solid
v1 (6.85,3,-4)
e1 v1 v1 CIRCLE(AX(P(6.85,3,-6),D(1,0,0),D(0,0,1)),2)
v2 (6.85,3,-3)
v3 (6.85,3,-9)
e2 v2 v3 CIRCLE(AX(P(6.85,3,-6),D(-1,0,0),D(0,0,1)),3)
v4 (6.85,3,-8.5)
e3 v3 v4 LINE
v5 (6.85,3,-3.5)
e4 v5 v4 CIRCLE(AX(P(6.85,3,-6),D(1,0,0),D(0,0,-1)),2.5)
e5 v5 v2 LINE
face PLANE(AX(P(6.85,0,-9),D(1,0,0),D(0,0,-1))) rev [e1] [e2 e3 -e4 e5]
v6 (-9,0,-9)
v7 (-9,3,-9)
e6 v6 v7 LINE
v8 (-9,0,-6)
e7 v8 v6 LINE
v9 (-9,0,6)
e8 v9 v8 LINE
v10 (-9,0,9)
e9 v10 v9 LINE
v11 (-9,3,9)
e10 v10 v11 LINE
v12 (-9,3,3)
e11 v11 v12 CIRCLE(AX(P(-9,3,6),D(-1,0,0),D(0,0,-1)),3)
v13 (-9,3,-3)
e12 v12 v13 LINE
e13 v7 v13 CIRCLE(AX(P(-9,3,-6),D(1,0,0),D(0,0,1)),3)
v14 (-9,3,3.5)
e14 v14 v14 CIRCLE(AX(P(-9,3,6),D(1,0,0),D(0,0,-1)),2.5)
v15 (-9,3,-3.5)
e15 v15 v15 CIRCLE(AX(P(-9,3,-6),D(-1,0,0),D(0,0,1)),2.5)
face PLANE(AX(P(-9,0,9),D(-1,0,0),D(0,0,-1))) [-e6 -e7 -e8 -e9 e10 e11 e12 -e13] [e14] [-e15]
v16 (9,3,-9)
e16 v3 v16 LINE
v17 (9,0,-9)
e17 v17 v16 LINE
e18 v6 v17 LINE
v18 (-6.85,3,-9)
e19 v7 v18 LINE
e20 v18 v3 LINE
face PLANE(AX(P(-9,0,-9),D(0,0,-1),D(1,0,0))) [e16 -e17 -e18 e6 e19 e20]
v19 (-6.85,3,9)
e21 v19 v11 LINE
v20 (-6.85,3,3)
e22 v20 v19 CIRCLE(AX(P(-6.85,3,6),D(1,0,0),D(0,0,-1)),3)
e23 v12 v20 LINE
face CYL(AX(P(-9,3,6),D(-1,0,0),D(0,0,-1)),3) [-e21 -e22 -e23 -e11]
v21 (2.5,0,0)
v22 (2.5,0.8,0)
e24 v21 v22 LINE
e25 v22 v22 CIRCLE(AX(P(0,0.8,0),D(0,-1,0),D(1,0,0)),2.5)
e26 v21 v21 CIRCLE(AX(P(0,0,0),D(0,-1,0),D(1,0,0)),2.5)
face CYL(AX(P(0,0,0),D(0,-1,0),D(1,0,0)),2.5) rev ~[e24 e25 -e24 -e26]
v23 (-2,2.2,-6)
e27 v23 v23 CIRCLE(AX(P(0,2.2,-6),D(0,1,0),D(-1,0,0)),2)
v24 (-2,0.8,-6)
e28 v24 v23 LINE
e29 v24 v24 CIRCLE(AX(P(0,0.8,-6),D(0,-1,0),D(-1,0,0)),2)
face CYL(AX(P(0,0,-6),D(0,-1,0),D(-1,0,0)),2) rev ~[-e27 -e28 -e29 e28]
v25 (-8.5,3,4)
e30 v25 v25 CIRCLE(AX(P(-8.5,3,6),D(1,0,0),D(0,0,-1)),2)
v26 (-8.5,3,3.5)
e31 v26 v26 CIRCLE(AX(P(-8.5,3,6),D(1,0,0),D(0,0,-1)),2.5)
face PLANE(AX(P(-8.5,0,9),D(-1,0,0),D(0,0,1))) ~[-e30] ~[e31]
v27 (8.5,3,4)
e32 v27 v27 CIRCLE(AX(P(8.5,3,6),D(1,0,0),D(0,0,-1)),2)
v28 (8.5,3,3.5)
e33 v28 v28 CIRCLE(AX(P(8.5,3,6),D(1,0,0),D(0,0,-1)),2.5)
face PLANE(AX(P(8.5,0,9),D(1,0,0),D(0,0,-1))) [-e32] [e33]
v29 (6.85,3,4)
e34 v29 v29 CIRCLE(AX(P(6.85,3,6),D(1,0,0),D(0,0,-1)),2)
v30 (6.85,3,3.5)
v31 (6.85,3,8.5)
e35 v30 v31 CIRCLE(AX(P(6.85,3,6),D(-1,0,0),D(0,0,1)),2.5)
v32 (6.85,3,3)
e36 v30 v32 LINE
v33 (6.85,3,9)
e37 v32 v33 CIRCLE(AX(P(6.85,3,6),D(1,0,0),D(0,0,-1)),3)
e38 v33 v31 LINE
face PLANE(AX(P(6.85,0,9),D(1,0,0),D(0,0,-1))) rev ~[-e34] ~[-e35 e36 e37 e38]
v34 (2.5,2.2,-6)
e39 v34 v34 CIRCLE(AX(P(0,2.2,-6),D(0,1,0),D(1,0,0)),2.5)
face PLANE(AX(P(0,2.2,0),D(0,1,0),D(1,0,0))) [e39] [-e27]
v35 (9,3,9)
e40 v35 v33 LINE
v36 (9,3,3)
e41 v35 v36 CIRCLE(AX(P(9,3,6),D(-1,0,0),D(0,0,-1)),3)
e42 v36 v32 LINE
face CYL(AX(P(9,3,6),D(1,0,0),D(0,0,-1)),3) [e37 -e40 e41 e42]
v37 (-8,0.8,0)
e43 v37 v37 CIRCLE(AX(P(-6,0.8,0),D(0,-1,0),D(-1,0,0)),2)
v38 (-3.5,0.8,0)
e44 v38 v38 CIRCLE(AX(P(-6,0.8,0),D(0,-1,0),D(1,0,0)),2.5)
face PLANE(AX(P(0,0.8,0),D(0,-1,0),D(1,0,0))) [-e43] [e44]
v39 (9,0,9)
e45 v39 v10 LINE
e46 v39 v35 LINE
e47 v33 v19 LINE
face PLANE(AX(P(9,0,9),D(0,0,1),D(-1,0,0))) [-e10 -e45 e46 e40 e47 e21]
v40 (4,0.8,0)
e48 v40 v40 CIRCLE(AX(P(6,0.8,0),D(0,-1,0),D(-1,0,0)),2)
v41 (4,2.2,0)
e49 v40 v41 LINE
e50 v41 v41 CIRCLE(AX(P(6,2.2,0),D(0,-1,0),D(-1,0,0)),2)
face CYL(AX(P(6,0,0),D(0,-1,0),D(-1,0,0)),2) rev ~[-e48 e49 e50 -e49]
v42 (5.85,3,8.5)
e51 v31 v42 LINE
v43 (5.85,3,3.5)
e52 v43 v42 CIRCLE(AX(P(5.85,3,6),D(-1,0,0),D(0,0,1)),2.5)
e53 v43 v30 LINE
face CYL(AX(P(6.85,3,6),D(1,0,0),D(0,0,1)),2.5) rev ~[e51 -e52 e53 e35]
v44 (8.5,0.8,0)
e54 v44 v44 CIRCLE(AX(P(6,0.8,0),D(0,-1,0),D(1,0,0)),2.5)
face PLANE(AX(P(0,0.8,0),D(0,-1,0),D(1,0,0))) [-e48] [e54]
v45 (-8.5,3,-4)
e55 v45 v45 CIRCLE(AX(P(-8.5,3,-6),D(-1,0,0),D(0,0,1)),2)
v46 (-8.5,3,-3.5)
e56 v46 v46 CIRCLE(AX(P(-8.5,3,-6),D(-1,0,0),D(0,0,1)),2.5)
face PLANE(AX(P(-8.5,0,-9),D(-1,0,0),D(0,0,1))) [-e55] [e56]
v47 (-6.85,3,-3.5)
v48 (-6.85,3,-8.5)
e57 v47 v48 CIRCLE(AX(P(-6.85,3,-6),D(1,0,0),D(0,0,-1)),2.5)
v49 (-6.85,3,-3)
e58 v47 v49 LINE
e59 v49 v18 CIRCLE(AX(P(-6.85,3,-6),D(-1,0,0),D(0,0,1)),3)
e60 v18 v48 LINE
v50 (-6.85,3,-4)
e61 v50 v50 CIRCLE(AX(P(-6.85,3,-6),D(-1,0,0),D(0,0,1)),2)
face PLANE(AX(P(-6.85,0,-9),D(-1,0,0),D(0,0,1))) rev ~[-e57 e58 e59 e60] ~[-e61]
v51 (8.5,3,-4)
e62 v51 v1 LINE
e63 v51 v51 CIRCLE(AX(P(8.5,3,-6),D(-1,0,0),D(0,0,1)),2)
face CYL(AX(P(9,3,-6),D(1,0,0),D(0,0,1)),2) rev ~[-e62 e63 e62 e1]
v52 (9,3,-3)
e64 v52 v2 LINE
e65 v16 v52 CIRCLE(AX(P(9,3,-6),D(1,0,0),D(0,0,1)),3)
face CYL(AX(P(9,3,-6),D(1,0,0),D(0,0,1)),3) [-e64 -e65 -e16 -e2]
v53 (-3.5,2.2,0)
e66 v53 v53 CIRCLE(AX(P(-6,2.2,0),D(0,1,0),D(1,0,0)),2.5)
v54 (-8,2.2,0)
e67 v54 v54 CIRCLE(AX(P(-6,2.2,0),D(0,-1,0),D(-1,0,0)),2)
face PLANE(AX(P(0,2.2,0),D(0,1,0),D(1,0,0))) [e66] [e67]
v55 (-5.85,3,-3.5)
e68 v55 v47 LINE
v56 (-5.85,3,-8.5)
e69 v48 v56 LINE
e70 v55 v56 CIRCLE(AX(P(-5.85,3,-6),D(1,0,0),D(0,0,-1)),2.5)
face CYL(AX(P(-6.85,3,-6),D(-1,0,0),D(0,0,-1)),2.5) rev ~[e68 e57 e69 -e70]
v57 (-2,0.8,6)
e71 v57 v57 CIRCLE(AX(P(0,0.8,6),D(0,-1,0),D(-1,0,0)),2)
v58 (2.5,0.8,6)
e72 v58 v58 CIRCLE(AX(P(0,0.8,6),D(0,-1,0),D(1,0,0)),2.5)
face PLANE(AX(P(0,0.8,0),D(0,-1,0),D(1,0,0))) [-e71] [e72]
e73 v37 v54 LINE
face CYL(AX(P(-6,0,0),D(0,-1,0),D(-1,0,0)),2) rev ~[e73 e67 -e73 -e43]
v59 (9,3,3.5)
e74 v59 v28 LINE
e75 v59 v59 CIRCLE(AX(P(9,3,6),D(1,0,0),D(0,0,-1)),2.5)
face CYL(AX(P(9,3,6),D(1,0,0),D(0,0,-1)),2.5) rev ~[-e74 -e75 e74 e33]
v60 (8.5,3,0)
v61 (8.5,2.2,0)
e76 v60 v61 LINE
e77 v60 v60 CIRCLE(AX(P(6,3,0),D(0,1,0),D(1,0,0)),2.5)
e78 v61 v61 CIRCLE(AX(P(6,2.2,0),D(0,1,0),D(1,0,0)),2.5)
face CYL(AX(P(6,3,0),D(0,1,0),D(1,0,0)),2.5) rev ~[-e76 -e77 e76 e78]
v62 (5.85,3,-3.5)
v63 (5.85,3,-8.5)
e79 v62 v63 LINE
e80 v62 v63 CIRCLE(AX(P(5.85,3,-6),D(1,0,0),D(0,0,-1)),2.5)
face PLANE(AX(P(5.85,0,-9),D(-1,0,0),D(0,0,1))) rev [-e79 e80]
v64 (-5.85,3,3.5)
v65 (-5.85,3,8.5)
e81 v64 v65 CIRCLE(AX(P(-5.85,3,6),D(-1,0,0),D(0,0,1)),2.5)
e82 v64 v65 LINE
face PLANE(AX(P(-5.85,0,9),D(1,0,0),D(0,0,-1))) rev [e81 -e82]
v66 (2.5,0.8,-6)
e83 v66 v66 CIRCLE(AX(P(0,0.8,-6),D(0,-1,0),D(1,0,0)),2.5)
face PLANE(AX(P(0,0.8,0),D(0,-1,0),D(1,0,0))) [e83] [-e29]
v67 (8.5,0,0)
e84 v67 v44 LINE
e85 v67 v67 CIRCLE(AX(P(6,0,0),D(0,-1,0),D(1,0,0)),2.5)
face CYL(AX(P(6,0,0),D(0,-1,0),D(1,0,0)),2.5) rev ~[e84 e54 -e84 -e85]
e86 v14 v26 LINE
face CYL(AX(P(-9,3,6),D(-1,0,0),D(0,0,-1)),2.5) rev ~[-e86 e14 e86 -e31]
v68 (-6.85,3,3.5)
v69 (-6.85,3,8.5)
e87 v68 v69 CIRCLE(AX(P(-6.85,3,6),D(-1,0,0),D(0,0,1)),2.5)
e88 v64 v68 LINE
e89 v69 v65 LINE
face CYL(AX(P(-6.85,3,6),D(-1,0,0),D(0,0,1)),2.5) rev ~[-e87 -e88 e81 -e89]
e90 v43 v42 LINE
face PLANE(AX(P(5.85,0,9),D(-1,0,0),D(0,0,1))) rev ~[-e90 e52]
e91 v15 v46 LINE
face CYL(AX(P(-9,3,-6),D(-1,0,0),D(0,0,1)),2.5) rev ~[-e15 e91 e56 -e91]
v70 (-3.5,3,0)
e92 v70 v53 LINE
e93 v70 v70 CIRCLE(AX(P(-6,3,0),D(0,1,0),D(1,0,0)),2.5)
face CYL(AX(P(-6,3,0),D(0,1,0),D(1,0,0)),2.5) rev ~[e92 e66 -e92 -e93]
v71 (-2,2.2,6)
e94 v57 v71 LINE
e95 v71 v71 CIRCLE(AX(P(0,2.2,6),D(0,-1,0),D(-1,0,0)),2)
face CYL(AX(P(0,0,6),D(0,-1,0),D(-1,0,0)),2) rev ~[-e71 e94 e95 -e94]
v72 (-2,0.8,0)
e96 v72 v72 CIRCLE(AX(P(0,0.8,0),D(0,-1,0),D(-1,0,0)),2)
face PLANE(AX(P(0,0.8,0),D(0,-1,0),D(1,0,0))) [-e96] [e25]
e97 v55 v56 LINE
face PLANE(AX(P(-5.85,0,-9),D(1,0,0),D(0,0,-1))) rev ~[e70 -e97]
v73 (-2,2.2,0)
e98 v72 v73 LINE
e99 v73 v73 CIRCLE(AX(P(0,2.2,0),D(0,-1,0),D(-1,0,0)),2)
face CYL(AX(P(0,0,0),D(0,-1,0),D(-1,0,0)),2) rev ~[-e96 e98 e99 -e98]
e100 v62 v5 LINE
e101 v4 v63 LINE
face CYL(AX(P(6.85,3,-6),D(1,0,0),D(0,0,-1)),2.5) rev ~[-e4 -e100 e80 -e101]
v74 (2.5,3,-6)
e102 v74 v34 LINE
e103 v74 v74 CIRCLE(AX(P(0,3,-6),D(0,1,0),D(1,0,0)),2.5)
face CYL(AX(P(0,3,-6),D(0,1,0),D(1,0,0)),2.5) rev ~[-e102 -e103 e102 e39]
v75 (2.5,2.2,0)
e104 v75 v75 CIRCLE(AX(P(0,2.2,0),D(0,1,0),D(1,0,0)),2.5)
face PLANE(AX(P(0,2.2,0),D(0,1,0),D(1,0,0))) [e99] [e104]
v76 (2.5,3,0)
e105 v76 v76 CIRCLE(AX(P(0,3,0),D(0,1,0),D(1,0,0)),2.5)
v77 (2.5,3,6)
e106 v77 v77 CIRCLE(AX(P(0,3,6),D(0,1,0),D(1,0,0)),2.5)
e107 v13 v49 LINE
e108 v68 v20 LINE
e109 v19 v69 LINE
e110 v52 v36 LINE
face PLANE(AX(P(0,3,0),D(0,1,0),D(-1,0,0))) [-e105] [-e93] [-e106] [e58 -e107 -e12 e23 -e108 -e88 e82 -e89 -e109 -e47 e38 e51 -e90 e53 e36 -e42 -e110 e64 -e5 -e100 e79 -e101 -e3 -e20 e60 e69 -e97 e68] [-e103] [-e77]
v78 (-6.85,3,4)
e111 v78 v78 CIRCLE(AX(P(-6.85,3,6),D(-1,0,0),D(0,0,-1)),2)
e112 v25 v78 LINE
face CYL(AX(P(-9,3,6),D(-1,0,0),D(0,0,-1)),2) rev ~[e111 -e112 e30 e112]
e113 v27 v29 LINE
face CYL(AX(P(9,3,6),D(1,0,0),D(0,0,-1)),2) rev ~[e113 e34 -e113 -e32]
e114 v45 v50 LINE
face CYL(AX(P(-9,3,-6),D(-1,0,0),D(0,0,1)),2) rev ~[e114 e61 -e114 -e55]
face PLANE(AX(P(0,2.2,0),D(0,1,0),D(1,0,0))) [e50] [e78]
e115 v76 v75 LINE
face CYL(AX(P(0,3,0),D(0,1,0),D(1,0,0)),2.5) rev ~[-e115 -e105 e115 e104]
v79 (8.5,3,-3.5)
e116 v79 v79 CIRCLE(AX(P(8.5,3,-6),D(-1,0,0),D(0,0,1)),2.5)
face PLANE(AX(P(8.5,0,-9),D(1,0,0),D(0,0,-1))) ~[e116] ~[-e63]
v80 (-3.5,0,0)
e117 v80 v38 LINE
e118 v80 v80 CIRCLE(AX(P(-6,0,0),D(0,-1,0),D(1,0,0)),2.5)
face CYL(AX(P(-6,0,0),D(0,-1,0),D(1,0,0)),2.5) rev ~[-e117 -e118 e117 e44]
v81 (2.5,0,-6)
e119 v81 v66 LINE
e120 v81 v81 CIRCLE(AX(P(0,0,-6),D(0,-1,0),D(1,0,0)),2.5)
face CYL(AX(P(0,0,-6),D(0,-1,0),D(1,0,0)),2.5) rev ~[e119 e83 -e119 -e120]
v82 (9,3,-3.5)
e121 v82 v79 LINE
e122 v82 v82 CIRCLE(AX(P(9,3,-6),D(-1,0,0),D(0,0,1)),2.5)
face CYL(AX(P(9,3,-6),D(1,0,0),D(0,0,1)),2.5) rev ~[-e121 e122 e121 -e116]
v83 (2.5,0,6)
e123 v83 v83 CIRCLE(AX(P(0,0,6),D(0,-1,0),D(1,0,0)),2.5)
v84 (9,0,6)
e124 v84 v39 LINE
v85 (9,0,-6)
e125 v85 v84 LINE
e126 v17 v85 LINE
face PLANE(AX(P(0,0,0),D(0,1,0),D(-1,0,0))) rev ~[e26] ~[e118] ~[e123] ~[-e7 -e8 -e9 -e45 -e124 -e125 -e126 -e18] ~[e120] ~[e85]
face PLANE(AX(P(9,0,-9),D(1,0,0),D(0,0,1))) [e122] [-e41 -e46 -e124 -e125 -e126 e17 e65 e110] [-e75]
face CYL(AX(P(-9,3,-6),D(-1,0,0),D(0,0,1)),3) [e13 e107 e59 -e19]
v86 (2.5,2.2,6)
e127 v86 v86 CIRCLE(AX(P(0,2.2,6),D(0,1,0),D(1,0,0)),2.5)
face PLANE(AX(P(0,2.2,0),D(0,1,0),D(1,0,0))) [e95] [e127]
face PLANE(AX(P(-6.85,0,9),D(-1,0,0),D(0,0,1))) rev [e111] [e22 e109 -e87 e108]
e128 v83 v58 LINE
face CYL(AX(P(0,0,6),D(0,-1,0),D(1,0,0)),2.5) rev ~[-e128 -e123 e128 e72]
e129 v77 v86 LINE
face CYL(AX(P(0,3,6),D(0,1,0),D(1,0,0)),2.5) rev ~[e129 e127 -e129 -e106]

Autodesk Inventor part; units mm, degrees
ref_plane "YZ Plane" through (0, 0, 0) normal (1, 0, 0) x (0, 1, 0)
sketch "Sketch1" plane through (0, 0, 0) normal (0, 1, 0) x (-1, 0, 0)
  line L0 (-9, 9) -> (9, 9)
  line L1 (9, 9) -> (9, -9)
  line L2 (9, -9) -> (-9, -9)
  line L3 (-9, -9) -> (-9, 9)
  line L4 (-9, 9) -> (9, -9) construction
  line L5 (9, 9) -> (-9, -9) construction
  circle A0 centre (0, 0) radius 2
  line L6 (0, 0) -> (0, -6) construction
  circle A1 centre (0, -6) radius 2
  circle A2 centre (6, 0) radius 2
  circle A3 centre (0, 6) radius 2
  circle A4 centre (-6, 0) radius 2
  dimension "d0" = 18
  dimension "d1" = 18
  dimension "d2" = 4
  dimension "d3" = 6
  dimension "d8" = 4
  dimension "d11" = 360
extrude "Extrusion1" add sketch "Sketch1" along normal blind 3
sketch "Sketch2" plane through (0, 3, 0) normal (0, 1, 0) x (1, 0, 0)
  circle A0 centre (0, 6) radius 2 projected
  circle A1 centre (0, 0) radius 2.5
  circle A2 centre (0, 6) radius 2.5
  circle A3 centre (-6, 0) radius 2.5
  circle A4 centre (0, -6) radius 2.5
  circle A5 centre (6, 0) radius 2.5
  dimension "d15" = 5
  dimension "d16" = 5
  dimension "d19" = 360
extrude "Extrusion2" cut sketch "Sketch2" against normal blind 0.8
sketch "Sketch3" plane through (0, 0, 0) normal (0, -1, 0) x (1, 0, 0)
  circle A0 centre (0, 0) radius 2.5
  circle A1 centre (0, -6) radius 2.5 projected
  circle A2 centre (0, -6) radius 2.5
  circle A3 centre (6, 0) radius 2.5
  circle A4 centre (0, 6) radius 2.5
  circle A5 centre (-6, 0) radius 2.5
  dimension "d25" = 360
extrude "Extrusion3" cut sketch "Sketch3" against normal blind 0.8
sketch "Sketch4" plane through (9, 0, 9) normal (1, 0, 0) x (0, 0, -1)
  line L0 (0, 3) -> (3, 3) construction
  line L1 (0, 3) -> (18, 3) projected
  circle A0 centre (3, 3) radius 3
  point P0 (9, 0)
  dimension "d29" = 3
extrude "Extrusion4" add sketch "Sketch4" against normal blind 2.15
sketch "Sketch5" plane through (9, 0, 9) normal (1, 0, 0) x (0, 0, -1)
  line L0 (0, 3) -> (6, 3) projected
  arc A0 (6, 3) -> (0, 3) centre (3, 3) ccw projected
  circle A1 centre (3, 3) radius 2
  point P0 (9, 0)
  dimension "d32" = 4
extrude "Extrusion5" cut sketch "Sketch5" against normal blind 3 contours A1 L0 | L0 A1
sketch "Sketch6" plane through (9, 0, 9) normal (1, 0, 0) x (0, 0, -1)
  circle A0 centre (3, 3) radius 2 projected
  circle A1 centre (3, 3) radius 2.5
  point P0 (9, 0)
  dimension "d35" = 5
extrude "Extrusion6" cut sketch "Sketch6" against normal blind 0.5
sketch "Sketch7" plane through (6.85, 0, 9) normal (-1, 0, 0) x (0, 0, 1)
  arc A0 (-1, 3) -> (-5, 3) centre (-3, 3) ccw projected
  circle A1 centre (-3, 3) radius 2.5
  point P0 (-9, 0)
  dimension "d38" = 5
extrude "Extrusion7" cut sketch "Sketch7" along normal blind 1
ref_plane "Work Plane1" through (-9, 0, 0) normal (0, 0, 1) x (1, 0, 0)
ref_plane "Work Plane2" through (0, 0, -9) normal (-1, 0, 0) x (0, 0, 1)
mirror "Mirror1" about plane through (-9, 0, 0) normal (0, 0, 1) of "Extrusion4", "Extrusion5", "Extrusion6", "Extrusion7"
mirror "Mirror2" about plane through (0, 0, -9) normal (-1, 0, 0) of "Extrusion4", "Extrusion5", "Extrusion6", "Extrusion7", "Mirror1"
properties part number "OlloHubToBase"
